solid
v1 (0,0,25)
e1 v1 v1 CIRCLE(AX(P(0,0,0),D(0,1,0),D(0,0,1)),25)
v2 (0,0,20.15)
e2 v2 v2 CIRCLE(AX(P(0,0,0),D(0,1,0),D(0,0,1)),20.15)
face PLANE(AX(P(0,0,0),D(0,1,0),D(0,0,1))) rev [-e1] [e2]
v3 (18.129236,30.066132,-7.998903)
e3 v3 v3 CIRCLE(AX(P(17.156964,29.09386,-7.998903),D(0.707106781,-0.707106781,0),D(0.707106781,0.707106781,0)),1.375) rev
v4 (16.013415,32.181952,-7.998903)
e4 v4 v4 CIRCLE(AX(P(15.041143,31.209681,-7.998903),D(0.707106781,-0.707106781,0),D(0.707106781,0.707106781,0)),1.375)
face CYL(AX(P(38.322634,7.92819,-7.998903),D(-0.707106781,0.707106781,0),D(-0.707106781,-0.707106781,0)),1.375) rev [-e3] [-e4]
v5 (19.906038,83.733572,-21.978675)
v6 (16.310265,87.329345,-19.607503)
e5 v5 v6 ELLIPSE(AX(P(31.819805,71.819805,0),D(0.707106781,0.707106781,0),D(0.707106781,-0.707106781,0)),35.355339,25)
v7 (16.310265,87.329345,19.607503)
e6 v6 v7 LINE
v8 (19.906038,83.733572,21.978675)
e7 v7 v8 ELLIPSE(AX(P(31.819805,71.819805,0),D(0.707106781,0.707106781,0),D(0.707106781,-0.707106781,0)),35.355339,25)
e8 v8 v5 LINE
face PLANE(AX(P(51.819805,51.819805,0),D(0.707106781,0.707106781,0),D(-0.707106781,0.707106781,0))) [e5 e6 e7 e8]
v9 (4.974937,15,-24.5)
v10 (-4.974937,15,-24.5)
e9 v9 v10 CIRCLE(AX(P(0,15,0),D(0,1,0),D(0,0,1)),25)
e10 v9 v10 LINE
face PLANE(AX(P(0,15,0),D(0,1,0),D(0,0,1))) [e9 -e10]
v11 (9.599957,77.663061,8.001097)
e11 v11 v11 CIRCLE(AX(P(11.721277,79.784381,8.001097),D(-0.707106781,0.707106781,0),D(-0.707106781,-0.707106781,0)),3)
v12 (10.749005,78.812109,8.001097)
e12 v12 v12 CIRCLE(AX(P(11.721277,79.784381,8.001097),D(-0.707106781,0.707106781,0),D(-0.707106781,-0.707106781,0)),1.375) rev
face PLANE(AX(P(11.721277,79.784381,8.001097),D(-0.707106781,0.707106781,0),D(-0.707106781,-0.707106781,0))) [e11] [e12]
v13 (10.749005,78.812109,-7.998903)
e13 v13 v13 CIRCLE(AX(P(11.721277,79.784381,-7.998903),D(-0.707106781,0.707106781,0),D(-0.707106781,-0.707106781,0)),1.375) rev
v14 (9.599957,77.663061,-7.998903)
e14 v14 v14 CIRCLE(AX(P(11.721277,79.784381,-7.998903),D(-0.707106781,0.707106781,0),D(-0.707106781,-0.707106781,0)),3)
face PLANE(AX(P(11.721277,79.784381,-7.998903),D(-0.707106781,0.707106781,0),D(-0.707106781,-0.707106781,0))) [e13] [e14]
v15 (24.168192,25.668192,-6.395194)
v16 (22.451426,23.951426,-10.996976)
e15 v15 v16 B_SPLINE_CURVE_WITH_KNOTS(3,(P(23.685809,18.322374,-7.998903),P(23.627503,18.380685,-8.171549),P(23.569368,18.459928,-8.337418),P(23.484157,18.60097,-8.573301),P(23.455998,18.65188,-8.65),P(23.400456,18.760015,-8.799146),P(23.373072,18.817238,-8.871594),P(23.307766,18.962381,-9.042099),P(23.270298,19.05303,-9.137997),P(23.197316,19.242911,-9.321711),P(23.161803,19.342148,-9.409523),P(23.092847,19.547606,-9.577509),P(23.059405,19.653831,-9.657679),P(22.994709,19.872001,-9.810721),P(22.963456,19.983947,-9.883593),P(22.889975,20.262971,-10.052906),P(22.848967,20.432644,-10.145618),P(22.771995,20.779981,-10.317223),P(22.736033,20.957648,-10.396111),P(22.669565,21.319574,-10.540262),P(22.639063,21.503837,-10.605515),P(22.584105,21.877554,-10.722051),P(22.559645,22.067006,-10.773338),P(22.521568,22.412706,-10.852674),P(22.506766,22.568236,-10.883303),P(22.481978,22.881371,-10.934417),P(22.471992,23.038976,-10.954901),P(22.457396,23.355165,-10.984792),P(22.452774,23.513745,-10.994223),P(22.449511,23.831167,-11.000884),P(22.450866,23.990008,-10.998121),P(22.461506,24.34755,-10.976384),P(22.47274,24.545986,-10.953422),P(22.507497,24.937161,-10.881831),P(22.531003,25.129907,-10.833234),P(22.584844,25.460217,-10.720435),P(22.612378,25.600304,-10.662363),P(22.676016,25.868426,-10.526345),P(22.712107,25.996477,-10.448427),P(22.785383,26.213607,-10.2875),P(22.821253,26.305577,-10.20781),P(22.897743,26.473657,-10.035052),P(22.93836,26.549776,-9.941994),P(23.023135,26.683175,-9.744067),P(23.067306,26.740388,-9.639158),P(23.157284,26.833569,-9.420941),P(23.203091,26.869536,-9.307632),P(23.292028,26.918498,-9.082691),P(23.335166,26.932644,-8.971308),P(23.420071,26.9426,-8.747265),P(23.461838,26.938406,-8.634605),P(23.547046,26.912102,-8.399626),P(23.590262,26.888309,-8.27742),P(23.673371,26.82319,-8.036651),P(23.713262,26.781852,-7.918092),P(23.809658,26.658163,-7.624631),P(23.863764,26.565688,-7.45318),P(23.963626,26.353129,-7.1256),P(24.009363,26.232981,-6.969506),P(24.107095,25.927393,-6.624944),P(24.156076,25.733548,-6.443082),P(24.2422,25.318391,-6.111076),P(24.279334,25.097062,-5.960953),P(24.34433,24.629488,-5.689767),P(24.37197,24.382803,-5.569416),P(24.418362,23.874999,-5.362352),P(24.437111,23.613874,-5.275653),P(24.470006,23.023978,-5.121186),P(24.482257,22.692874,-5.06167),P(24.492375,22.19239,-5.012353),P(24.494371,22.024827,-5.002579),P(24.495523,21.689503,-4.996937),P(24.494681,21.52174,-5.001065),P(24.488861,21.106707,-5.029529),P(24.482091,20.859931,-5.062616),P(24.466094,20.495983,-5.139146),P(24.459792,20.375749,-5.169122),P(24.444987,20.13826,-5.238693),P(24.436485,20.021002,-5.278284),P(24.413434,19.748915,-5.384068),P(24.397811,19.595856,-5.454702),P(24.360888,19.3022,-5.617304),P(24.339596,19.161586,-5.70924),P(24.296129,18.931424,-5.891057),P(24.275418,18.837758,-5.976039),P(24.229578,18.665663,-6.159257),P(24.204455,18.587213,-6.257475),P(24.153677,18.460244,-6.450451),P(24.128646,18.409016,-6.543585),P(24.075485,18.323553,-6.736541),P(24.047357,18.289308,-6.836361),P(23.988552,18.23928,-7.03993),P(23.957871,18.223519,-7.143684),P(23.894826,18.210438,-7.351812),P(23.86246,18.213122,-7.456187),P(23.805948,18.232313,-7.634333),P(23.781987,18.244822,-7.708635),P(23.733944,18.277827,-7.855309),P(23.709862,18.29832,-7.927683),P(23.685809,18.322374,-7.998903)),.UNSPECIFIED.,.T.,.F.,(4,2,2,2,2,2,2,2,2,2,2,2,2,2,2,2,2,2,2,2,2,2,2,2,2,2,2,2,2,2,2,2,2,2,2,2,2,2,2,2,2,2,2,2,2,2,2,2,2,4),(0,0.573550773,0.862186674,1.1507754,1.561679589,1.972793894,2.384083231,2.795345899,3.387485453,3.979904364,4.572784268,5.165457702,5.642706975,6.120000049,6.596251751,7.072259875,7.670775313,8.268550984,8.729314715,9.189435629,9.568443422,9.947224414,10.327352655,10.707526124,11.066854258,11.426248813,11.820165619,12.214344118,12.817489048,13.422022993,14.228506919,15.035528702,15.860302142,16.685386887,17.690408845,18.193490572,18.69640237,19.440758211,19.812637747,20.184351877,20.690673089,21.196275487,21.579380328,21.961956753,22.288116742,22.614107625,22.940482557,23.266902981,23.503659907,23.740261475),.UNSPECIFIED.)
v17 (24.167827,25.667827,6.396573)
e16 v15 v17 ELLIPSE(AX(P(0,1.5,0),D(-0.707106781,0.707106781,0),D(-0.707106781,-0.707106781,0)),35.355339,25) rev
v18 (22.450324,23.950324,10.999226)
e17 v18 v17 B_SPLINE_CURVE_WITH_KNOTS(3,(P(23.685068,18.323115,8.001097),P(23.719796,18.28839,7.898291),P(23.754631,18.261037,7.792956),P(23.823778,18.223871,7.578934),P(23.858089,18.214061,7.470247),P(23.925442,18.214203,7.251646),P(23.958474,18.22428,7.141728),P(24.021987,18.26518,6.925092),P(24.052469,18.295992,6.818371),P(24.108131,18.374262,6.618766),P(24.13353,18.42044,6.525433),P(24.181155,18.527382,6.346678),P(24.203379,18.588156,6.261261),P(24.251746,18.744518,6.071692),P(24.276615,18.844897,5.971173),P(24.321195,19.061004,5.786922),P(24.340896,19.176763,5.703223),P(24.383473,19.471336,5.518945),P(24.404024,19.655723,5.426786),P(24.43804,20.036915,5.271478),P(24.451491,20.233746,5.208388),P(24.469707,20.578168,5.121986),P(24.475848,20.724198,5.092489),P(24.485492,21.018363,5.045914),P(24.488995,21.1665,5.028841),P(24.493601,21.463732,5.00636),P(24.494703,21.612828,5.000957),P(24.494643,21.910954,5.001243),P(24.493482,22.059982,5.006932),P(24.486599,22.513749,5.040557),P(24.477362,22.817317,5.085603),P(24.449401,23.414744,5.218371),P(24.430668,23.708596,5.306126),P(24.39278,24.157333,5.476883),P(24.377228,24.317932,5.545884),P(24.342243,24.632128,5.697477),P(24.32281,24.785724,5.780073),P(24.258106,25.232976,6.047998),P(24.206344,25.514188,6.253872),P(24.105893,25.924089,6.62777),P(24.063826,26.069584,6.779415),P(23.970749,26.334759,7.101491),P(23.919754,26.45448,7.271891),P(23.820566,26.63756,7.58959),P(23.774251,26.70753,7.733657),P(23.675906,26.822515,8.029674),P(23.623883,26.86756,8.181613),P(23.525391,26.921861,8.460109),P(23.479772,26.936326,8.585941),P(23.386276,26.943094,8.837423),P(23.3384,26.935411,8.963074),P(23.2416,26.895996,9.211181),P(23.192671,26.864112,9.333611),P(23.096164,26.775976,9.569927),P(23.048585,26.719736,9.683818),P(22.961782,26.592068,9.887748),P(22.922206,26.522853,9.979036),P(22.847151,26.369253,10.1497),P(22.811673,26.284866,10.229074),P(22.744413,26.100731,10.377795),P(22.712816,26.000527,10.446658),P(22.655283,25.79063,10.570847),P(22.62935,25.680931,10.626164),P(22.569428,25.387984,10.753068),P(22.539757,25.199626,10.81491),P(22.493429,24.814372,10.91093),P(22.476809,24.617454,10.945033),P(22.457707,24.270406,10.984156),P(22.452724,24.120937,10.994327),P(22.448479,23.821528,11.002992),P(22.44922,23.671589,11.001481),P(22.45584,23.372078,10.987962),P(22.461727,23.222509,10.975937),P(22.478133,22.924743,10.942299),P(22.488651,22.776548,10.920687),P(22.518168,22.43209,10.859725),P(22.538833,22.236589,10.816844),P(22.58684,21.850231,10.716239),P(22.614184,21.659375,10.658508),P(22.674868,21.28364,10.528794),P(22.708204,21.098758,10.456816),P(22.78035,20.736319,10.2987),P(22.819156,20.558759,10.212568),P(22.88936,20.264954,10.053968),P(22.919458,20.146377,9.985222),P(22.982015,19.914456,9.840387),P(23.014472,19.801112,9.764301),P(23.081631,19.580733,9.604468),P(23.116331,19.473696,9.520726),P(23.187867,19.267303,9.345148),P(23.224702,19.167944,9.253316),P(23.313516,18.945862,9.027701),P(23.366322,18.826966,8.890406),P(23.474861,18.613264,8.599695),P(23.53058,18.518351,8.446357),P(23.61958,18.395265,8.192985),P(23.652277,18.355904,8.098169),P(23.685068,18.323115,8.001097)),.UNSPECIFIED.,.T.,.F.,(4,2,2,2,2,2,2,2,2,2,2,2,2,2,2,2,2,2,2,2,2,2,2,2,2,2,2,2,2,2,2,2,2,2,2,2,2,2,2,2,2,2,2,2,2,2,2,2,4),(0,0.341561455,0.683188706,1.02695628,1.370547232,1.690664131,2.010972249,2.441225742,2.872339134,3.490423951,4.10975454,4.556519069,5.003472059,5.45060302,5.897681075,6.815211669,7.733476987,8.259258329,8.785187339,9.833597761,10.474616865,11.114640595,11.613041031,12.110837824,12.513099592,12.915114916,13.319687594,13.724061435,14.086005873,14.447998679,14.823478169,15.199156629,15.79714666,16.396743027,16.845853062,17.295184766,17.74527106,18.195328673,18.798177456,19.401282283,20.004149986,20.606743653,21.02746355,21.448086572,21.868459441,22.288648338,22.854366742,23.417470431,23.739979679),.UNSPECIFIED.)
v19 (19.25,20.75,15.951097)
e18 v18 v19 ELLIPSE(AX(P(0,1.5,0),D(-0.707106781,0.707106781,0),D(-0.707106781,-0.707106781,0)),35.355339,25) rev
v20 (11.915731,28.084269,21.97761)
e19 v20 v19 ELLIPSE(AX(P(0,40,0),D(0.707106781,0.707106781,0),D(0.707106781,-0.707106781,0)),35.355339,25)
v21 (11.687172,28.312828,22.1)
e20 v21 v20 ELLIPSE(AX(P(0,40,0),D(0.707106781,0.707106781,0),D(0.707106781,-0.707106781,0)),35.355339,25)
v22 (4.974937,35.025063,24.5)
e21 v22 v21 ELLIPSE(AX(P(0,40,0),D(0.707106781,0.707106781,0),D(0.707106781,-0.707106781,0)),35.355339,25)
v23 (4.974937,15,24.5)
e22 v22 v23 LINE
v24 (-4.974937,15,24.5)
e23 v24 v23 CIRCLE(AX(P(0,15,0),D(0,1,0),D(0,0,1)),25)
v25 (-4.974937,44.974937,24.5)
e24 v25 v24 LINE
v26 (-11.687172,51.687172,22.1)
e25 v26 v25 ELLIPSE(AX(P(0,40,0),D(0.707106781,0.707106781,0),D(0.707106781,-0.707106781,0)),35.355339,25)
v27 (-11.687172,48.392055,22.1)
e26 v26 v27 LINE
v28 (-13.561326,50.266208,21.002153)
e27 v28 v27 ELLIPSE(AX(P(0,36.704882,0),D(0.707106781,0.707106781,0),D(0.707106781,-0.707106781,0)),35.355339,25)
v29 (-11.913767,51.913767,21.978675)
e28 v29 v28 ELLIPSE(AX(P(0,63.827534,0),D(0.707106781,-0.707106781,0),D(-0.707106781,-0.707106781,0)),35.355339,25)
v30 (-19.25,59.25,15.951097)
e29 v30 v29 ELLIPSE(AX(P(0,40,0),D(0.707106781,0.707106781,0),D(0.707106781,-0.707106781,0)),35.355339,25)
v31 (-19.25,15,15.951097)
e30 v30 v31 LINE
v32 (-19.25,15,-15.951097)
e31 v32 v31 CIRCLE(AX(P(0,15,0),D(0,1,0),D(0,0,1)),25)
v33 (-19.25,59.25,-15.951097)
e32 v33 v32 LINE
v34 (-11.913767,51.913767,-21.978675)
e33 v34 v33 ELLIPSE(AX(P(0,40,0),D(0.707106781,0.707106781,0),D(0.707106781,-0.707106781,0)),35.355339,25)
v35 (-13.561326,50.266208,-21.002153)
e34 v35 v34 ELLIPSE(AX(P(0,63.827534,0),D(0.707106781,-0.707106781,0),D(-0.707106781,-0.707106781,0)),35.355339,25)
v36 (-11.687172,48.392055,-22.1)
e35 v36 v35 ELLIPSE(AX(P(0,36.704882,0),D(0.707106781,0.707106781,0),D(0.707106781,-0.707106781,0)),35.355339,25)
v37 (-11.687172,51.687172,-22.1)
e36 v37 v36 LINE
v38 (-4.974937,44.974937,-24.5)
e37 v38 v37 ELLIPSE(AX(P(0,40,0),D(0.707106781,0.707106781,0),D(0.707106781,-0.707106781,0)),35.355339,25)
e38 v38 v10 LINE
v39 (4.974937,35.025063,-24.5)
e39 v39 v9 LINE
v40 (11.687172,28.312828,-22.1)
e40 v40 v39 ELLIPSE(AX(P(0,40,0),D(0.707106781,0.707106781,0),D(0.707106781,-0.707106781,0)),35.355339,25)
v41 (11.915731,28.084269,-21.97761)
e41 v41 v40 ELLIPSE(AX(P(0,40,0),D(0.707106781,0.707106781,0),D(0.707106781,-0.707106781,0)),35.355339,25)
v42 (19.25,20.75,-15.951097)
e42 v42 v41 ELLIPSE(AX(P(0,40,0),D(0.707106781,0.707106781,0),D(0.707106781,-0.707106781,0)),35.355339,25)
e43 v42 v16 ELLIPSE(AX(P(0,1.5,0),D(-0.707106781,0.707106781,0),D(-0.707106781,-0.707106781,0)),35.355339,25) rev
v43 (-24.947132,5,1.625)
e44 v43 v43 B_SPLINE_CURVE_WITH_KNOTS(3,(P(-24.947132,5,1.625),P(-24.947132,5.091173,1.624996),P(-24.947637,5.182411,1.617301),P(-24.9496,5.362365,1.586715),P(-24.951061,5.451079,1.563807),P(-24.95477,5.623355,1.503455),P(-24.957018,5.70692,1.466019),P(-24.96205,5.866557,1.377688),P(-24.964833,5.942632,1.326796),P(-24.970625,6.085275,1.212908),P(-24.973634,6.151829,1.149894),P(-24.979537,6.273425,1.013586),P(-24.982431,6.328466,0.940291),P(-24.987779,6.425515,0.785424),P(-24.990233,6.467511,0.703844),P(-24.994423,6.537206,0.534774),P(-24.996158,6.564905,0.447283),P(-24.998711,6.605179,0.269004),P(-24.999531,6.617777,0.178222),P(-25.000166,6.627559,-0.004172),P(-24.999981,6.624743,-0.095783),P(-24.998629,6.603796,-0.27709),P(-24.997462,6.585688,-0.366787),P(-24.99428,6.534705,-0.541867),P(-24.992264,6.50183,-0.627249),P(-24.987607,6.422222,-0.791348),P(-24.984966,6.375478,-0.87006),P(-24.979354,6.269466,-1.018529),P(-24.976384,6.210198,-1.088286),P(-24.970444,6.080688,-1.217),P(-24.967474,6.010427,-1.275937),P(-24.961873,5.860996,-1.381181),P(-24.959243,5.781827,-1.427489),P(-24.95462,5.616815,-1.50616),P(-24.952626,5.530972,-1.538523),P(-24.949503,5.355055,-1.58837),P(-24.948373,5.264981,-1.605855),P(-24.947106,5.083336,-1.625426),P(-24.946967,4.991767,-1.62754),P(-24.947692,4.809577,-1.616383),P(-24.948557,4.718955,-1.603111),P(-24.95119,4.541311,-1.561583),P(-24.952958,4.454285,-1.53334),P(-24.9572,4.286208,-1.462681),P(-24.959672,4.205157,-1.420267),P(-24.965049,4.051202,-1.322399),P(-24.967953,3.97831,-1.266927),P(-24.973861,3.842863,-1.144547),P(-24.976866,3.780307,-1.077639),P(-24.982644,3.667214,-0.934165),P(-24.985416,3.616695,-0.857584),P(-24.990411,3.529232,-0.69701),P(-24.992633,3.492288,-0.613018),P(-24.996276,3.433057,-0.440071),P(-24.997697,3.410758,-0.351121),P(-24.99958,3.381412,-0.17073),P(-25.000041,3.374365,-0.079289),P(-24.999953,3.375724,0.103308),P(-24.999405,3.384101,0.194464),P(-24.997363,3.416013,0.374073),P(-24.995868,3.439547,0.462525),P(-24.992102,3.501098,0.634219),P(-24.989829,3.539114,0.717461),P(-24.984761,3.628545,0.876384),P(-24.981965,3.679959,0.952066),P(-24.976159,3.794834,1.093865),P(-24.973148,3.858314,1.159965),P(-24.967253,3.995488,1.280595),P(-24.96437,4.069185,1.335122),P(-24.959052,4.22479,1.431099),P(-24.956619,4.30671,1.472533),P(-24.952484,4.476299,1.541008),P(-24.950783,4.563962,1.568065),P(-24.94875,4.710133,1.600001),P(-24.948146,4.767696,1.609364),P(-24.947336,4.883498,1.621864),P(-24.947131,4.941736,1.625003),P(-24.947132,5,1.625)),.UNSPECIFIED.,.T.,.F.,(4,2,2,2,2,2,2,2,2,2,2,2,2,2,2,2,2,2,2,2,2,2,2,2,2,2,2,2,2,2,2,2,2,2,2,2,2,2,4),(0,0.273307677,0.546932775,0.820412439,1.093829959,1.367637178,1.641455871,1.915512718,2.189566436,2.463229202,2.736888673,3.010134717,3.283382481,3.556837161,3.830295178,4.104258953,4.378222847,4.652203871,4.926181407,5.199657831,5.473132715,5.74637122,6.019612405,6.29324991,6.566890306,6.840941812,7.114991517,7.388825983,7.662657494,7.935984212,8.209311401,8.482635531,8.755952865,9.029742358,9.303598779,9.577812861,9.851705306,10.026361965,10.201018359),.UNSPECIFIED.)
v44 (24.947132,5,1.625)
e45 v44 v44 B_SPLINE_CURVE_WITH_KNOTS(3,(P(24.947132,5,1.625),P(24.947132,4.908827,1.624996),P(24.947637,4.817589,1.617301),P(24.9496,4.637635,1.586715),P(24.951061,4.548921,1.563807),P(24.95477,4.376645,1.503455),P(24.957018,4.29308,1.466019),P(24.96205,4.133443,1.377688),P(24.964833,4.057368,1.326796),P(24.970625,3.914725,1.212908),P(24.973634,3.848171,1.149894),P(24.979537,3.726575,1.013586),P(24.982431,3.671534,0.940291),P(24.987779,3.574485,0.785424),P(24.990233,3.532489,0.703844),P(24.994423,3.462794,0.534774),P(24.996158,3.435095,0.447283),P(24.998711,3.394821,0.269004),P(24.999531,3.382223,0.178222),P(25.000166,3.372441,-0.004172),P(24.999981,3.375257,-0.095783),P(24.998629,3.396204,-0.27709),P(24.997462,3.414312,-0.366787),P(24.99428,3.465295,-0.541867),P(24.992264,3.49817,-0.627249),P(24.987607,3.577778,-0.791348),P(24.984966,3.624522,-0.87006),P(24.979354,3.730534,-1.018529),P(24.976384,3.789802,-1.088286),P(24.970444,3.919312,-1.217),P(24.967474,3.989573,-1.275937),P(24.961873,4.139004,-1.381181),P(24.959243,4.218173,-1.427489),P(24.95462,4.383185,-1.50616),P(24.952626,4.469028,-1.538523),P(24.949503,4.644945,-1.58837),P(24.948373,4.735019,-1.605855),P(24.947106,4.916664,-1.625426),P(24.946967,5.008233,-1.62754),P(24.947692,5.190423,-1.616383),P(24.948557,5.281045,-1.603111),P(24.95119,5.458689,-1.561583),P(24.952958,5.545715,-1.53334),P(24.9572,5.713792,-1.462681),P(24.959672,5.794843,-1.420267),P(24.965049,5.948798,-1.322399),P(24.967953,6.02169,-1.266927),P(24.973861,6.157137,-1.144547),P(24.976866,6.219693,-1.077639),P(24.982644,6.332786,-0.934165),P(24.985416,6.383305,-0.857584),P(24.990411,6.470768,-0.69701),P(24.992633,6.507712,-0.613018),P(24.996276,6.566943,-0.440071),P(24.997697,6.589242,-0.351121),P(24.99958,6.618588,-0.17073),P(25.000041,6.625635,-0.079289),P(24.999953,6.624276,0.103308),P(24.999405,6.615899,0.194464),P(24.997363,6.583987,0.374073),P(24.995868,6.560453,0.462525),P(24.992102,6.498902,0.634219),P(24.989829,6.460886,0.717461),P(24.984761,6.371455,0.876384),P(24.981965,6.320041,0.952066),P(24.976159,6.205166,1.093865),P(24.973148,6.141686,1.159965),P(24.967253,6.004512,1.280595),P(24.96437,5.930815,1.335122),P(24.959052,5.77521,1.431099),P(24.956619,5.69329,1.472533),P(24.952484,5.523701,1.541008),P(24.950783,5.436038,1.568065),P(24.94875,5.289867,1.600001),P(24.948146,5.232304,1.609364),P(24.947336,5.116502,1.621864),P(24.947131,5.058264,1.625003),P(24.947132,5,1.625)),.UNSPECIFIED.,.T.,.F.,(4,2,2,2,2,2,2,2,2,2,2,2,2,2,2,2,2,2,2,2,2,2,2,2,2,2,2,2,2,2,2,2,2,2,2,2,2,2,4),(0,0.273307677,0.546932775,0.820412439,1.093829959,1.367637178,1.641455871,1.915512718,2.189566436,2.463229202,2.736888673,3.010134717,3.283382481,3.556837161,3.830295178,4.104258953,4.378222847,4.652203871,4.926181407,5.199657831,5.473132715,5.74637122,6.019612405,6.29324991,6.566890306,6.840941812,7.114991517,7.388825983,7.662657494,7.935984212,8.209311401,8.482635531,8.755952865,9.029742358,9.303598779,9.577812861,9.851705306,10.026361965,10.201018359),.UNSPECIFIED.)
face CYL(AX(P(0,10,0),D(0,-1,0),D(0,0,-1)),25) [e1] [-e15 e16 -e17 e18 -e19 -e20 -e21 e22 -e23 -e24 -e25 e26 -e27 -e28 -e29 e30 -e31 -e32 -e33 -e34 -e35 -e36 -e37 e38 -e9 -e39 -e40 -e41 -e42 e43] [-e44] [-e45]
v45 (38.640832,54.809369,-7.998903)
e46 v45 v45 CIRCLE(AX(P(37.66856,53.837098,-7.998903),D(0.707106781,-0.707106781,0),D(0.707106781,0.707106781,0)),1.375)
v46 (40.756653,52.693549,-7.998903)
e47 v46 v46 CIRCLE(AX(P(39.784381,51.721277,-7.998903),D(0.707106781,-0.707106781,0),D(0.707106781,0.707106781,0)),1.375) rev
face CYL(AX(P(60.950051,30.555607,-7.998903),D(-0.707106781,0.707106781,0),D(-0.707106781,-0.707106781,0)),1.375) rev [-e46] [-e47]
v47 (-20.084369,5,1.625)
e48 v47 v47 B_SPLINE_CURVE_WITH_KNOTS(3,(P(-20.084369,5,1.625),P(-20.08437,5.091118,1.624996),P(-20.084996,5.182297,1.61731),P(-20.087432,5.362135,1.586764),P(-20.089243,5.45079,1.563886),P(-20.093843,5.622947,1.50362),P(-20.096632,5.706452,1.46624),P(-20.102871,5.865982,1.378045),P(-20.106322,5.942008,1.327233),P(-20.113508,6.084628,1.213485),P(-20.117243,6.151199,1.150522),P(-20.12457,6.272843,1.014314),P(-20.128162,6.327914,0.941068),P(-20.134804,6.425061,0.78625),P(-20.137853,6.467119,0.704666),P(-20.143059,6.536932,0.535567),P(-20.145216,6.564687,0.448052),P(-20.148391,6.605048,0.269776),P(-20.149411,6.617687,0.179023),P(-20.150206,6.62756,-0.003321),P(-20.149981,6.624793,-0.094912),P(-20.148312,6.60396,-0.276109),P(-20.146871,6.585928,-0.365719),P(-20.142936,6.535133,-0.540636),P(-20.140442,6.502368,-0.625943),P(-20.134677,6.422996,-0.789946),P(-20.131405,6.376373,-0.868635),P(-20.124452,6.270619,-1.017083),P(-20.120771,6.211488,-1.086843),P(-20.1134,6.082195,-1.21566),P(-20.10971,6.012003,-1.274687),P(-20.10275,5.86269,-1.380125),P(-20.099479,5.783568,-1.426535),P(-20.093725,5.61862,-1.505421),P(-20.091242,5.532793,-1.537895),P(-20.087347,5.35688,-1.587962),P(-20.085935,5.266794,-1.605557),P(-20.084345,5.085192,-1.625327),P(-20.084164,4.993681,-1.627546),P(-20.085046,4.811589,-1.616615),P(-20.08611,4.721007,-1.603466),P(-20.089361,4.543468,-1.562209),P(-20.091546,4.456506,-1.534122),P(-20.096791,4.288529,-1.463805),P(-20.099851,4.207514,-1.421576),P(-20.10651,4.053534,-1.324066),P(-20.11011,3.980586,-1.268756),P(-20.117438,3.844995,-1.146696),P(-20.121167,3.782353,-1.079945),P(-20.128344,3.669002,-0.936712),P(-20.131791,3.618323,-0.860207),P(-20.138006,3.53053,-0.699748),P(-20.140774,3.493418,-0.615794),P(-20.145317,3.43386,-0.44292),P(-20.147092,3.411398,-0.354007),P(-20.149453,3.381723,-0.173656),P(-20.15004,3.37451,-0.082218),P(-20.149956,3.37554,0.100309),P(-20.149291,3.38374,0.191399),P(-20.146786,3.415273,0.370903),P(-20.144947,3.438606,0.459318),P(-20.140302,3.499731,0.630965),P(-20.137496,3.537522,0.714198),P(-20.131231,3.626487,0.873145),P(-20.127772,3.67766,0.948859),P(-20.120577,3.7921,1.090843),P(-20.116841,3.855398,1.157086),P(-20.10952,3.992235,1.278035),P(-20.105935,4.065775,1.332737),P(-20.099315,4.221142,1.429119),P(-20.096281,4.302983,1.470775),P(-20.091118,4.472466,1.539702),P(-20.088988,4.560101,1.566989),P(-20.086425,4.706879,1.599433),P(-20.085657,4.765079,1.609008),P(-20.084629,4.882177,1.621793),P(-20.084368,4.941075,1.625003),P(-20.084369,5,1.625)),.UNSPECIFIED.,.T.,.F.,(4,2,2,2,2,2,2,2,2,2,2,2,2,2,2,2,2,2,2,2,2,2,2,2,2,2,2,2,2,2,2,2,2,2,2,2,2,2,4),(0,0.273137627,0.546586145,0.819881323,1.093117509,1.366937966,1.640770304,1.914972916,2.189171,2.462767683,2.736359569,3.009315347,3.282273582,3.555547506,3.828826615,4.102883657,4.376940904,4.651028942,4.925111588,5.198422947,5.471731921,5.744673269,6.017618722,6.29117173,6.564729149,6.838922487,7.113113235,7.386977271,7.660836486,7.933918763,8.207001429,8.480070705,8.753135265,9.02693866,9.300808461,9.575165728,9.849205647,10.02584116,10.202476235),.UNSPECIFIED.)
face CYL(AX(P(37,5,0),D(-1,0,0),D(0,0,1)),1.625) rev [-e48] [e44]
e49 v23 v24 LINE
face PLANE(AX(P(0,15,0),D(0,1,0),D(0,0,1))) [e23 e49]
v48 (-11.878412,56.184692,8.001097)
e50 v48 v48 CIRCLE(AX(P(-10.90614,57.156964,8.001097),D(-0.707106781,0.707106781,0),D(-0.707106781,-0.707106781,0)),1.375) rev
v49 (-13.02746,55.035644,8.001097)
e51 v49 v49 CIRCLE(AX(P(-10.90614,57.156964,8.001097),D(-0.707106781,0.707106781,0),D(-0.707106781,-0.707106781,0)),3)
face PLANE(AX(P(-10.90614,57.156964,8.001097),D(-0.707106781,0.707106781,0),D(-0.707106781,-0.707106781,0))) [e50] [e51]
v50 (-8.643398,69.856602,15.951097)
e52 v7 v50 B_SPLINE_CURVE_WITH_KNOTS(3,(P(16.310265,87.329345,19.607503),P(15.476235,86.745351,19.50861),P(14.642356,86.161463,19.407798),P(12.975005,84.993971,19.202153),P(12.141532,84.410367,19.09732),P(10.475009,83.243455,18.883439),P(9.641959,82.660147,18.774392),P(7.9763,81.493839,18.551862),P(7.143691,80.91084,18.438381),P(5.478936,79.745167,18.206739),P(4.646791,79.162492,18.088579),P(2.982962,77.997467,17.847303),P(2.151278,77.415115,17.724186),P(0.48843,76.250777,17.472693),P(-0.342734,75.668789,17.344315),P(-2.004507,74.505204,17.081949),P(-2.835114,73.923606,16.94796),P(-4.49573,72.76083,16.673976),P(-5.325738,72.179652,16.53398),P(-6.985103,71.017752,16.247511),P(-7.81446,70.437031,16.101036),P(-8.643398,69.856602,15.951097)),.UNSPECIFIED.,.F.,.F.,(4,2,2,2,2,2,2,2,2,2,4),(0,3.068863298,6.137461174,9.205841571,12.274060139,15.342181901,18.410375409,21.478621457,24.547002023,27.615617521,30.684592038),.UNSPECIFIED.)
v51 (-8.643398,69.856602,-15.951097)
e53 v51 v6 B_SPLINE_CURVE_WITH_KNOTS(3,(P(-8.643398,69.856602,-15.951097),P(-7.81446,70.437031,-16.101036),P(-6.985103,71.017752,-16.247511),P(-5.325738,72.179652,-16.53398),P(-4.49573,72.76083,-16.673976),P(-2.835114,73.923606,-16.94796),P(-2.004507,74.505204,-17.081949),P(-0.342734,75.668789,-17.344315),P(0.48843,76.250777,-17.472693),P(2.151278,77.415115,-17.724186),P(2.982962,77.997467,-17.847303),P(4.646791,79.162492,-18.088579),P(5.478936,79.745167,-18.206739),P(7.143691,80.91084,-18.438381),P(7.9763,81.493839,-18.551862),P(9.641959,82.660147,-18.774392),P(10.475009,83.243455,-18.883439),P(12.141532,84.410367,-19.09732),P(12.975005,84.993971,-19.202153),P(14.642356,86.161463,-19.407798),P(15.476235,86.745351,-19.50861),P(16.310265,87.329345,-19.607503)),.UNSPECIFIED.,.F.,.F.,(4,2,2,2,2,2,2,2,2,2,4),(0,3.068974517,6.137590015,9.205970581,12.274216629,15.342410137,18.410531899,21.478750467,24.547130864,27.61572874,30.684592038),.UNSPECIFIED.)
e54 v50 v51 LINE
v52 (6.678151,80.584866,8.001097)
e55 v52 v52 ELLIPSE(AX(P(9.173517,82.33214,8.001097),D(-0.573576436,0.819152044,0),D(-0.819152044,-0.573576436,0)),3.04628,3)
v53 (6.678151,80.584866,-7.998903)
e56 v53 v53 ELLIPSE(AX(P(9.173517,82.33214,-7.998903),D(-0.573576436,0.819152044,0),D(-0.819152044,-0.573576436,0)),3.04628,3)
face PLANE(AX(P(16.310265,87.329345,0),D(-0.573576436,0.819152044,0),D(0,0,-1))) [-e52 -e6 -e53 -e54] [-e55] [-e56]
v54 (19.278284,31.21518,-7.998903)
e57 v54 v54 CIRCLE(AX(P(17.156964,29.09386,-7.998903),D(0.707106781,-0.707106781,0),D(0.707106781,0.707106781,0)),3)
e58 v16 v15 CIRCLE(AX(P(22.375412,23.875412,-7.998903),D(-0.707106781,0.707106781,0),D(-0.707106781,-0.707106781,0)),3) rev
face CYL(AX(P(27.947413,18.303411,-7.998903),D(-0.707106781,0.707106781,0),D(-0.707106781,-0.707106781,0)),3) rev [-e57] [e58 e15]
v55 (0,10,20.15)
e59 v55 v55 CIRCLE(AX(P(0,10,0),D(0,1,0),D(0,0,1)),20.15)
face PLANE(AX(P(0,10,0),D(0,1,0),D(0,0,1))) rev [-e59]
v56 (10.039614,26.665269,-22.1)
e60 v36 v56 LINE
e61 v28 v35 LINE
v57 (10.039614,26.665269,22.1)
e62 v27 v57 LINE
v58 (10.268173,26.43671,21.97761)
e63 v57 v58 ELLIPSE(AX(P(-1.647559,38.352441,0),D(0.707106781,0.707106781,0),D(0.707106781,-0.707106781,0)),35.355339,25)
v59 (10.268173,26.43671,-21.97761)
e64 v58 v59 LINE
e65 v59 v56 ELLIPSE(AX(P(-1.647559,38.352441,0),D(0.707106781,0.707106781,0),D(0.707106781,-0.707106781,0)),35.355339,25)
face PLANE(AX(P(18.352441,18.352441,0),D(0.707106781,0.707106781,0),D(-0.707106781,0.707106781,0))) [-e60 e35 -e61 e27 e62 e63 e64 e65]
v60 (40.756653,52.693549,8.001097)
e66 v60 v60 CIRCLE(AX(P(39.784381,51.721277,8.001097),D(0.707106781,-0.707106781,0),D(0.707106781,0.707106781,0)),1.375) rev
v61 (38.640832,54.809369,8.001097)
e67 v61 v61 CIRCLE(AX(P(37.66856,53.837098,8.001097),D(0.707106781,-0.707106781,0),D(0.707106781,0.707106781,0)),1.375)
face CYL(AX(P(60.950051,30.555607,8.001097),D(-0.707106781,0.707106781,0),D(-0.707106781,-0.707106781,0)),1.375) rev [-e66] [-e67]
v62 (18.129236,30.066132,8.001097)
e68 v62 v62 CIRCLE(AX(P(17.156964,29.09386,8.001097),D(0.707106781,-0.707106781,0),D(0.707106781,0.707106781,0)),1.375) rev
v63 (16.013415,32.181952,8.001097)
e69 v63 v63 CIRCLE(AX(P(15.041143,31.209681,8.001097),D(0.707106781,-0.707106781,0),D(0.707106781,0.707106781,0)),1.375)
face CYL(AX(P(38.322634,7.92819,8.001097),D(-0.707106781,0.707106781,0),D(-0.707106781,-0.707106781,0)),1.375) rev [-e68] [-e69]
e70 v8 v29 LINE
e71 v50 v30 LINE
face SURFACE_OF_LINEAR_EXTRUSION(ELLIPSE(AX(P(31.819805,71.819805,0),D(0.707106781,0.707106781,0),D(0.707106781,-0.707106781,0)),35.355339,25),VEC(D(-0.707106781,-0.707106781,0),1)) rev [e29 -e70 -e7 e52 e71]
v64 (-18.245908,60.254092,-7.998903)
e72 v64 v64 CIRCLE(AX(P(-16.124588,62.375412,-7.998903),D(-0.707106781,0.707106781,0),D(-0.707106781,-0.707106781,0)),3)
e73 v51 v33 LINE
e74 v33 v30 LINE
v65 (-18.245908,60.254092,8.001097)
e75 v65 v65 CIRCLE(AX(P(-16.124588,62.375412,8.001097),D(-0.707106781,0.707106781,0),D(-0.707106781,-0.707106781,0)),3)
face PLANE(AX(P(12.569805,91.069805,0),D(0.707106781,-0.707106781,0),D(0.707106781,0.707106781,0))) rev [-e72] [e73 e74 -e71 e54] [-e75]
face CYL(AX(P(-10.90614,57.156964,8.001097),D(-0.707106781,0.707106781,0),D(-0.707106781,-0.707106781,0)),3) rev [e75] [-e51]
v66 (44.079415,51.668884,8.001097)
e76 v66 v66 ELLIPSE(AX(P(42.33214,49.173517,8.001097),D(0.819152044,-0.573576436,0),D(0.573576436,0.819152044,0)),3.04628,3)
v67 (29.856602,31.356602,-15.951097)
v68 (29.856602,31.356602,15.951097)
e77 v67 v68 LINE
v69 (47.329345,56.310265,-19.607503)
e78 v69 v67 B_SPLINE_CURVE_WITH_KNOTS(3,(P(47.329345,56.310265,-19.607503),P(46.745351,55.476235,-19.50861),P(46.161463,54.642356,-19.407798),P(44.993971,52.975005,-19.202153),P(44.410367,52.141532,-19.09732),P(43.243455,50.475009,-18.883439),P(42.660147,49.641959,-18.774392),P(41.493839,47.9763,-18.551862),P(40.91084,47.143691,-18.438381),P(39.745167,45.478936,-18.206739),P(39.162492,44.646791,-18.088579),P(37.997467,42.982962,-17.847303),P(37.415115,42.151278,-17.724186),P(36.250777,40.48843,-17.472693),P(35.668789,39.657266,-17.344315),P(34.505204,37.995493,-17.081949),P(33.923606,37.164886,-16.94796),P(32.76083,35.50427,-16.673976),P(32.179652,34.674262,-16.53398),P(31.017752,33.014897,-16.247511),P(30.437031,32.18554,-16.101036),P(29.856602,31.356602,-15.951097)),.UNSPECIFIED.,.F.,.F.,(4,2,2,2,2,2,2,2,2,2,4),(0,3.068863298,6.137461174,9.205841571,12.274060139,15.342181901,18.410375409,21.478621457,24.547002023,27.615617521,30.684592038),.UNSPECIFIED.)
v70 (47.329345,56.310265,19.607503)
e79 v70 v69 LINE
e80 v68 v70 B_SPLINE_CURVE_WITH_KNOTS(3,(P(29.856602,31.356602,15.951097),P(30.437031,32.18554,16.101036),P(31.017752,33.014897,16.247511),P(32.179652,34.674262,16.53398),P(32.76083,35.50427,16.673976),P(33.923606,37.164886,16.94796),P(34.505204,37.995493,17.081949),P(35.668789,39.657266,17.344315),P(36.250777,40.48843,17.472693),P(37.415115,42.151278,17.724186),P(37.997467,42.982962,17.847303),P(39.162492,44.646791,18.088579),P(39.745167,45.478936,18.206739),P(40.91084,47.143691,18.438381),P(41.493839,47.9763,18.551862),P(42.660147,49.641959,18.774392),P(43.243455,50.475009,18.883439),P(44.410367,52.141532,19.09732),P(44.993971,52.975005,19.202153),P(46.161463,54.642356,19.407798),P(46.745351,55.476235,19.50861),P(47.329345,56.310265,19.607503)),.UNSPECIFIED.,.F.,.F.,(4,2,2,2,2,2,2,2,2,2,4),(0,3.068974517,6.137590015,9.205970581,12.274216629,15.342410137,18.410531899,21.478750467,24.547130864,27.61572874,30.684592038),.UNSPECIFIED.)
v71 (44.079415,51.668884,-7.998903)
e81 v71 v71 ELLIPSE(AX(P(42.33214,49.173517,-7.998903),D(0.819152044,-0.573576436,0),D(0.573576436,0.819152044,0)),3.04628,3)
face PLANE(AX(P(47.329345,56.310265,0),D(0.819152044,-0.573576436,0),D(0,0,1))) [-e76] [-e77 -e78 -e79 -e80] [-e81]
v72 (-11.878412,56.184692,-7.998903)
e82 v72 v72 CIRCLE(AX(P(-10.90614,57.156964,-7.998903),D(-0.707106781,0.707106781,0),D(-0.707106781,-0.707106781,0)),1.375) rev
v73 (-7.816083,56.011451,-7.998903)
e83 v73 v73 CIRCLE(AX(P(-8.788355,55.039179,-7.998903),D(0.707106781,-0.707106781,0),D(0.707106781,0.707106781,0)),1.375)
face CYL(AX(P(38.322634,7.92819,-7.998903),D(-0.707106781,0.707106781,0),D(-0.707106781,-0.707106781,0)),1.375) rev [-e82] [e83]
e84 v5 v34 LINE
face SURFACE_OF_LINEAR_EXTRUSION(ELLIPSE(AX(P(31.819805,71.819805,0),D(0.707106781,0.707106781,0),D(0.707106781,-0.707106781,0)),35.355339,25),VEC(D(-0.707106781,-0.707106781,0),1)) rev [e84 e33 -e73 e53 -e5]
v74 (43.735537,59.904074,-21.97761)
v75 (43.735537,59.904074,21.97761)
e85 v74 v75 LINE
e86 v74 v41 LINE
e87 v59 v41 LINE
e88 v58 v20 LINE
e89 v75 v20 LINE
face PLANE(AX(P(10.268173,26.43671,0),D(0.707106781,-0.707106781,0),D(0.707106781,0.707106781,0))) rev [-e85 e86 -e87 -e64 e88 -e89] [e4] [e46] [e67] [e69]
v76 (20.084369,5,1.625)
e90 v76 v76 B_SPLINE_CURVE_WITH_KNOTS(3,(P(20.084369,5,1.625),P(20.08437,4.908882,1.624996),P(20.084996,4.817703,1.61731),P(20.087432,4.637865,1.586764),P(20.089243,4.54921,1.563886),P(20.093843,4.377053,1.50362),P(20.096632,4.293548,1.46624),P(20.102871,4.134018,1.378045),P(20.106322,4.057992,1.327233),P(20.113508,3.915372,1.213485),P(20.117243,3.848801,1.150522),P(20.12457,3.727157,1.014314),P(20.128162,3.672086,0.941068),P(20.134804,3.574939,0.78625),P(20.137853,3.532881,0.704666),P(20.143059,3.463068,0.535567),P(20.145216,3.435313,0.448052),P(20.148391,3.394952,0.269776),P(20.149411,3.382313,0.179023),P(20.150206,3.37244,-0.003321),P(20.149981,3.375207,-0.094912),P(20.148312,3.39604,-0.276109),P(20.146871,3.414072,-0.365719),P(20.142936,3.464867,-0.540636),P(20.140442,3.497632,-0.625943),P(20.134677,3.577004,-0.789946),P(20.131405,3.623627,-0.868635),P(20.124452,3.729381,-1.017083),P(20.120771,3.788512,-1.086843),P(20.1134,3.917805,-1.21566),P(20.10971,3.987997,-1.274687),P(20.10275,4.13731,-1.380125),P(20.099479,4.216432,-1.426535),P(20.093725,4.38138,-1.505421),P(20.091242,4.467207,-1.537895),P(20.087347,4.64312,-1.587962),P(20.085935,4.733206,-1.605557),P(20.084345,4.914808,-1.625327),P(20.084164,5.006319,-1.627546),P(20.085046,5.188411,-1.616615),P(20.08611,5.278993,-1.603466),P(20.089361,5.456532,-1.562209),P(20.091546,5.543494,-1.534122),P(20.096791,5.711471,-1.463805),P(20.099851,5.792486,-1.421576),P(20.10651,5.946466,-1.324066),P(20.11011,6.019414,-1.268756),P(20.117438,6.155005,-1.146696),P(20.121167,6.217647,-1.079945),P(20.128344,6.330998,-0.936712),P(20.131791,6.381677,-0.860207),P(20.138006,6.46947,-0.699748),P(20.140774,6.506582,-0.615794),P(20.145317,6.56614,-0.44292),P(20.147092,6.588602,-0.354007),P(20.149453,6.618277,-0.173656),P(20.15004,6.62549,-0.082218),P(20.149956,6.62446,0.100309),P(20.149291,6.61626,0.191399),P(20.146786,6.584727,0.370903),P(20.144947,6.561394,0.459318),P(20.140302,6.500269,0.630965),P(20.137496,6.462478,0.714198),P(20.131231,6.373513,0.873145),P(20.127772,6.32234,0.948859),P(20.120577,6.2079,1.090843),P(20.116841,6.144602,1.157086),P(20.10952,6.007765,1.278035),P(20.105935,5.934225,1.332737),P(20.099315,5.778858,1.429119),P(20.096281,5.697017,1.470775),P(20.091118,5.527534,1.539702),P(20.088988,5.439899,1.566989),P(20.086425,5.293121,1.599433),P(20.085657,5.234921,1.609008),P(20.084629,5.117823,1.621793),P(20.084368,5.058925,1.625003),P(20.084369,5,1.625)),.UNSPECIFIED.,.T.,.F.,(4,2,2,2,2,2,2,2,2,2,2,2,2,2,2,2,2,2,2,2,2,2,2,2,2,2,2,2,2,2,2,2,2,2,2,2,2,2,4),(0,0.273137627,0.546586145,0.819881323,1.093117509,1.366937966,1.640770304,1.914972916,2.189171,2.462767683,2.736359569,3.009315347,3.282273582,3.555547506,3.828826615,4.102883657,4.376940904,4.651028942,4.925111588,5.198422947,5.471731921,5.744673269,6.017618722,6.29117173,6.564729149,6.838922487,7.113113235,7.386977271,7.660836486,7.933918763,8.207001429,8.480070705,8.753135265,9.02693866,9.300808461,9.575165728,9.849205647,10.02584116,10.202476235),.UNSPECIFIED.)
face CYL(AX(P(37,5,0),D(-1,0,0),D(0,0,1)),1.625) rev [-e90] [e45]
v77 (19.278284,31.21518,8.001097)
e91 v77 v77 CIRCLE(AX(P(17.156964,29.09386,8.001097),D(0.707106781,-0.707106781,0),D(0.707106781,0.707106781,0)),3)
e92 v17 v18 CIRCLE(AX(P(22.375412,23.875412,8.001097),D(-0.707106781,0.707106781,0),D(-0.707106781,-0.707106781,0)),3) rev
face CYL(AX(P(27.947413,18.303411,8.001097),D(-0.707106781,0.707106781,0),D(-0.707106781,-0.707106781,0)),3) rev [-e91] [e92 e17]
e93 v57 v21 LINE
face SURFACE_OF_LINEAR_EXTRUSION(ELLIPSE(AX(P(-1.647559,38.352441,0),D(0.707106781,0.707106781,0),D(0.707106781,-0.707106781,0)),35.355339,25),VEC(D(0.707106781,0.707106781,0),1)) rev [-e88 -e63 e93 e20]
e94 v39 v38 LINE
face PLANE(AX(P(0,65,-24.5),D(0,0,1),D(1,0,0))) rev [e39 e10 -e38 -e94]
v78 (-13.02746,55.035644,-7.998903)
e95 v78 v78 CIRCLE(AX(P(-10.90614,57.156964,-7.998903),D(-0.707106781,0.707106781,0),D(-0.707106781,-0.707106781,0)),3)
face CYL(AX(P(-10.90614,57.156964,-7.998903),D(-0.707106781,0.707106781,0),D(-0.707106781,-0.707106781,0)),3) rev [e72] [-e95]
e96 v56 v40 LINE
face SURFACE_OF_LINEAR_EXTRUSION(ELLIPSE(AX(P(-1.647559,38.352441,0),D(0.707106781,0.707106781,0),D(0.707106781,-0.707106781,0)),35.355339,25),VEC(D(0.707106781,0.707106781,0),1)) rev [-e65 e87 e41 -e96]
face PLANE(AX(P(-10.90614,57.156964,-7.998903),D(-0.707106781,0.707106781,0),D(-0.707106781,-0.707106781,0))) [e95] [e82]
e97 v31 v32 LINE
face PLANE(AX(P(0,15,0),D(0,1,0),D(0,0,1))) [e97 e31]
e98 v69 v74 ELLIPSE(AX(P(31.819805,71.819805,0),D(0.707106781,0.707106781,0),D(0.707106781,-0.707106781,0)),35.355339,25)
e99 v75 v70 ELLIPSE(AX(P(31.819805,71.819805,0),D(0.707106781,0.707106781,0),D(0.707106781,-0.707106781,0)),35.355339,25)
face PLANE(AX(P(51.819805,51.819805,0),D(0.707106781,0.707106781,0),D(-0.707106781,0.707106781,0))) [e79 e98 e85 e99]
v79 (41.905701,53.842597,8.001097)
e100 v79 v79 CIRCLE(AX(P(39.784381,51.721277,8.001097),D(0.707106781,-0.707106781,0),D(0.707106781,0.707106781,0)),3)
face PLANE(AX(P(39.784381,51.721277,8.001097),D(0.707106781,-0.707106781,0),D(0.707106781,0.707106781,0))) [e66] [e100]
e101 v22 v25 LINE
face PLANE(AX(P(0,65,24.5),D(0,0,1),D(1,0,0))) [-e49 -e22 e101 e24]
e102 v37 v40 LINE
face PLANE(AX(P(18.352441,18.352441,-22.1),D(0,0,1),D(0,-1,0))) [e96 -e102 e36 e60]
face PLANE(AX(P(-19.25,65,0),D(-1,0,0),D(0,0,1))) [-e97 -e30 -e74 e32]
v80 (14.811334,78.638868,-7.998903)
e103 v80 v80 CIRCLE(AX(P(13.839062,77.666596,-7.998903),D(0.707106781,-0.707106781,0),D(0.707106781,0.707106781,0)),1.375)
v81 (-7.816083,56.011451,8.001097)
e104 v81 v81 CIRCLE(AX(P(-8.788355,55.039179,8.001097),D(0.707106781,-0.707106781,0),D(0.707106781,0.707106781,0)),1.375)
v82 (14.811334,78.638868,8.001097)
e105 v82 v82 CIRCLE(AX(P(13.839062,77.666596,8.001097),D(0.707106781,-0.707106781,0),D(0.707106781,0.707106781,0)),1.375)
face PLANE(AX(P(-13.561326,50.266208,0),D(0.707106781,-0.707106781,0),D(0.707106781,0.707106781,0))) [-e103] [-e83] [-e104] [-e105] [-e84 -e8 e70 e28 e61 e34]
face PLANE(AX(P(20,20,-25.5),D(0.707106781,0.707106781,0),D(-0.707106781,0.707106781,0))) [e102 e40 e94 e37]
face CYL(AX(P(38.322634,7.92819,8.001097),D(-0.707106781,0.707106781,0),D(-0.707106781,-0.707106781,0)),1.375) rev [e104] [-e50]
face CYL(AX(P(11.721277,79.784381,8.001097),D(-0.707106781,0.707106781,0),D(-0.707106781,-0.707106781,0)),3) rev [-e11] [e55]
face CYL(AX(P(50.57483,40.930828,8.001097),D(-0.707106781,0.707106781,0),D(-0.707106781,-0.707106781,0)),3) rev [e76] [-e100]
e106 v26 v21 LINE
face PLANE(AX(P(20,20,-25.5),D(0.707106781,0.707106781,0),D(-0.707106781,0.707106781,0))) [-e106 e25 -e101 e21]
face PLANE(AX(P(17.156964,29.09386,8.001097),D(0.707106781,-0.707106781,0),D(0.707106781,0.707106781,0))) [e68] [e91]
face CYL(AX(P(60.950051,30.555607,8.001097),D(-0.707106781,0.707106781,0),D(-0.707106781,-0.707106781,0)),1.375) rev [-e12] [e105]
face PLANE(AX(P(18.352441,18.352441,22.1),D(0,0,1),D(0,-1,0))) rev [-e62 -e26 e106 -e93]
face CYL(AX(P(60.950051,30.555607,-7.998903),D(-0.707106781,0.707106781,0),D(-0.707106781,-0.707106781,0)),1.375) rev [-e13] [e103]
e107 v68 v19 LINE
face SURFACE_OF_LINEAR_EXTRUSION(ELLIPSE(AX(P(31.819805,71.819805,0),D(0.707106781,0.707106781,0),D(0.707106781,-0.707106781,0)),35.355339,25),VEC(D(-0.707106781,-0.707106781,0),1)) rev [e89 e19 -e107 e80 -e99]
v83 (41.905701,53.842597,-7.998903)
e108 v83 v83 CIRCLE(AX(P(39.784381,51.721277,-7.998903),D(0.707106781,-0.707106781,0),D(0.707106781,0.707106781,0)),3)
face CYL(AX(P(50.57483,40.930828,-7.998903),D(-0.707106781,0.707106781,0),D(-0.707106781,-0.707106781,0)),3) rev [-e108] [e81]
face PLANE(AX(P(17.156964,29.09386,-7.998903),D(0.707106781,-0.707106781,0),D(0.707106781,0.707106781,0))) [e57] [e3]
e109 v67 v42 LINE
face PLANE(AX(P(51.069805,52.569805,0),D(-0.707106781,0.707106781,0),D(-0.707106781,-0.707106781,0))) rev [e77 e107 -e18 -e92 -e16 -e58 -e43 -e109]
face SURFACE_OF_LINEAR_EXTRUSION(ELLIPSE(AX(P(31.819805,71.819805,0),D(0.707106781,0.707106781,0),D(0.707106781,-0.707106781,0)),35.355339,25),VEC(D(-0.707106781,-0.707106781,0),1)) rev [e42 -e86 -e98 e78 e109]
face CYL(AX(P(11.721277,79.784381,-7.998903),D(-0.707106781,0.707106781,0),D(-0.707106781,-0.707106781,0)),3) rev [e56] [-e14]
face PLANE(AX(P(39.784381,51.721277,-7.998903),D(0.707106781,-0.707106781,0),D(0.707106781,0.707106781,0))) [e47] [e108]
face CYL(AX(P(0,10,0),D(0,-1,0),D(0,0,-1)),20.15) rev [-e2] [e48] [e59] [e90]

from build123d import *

# Parameters (mm, degrees)
SKETCH1_R               = 25
SKETCH1_R_2             = 20.15
BOSS_EXTRUDE1_DEPTH     = 10
SKETCH2_R               = 25
BOSS_EXTRUDE2_DEPTH     = 5
BOSS_EXTRUDE3_DEPTH     = 50
CUT_EXTRUDE1_DEPTH      = 50
SKETCH5_W               = 44
SKETCH5_H               = 33.5
CUT_EXTRUDE2_DEPTH      = 2.33
SKETCH6_W               = 31.902194282
SKETCH6_H               = 10.372222151
BOSS_EXTRUDE5_DEPTH     = 45
BOSS_EXTRUDE6_DEPTH     = 45
BOSS_EXTRUDE7_DEPTH     = 20
SKETCH10_R              = 1.375
CUT_EXTRUDE3_DEPTH      = 77
SKETCH11_R              = 1.375
CUT_EXTRUDE4_DEPTH      = 77
SKETCH12_R              = 3
CUT_EXTRUDE5_DEPTH      = 7.38
CUT_EXTRUDE6_DEPTH      = 7.88
CUT_EXTRUDE6_DEPTH_BACK = 7.38
SKETCH13_R              = 3
CHAMFER1_SIZE           = 30
CHAMFER1_SIZE_2         = 5.289809421
CUT_EXTRUDE7_DEPTH      = 37
CUT_EXTRUDE7_DEPTH_BACK = 37
SKETCH16_R              = 1.625


with BuildPart() as part:
    # Sketch1 → Boss-Extrude1 (new body)
    with BuildSketch(Plane(origin=(0, 0, 0), x_dir=(1, 0, 0), z_dir=(0, 1, 0))):
        with Locations(Location((0, 0, 0), (0, 0, 270))):
            Circle(SKETCH1_R)
        with Locations(Location((0, 0, 0), (0, 0, 270))):
            Circle(SKETCH1_R_2, mode=Mode.SUBTRACT)
    extrude(amount=BOSS_EXTRUDE1_DEPTH)

    # Sketch2 → Boss-Extrude2 (add)
    with BuildSketch(Plane(origin=(0, 10, 0), x_dir=(1, 0, 0), z_dir=(0, 1, 0))):
        with Locations(Location((0, 0, 0), (0, 0, 270))):
            Circle(SKETCH2_R)
    extrude(amount=BOSS_EXTRUDE2_DEPTH)

    # Sketch3 → Boss-Extrude3 (add)
    with BuildSketch(Plane(origin=(0, 15, 0), x_dir=(1, 0, 0), z_dir=(0, 1, 0))):
        with BuildLine():
            ThreePointArc((4.974937186, -24.5), (12.844564237, -21.448010853), (19.25, -15.951097141))
            Line((19.25, -15.951097141), (19.25, 15.951097141))
            ThreePointArc((19.25, 15.951097141), (12.844564237, 21.448010853), (4.974937186, 24.5))
            Line((4.974937186, 24.5), (-4.974937186, 24.5))
            ThreePointArc((-4.974937186, 24.5), (-12.844564237, 21.448010853), (-19.25, 15.951097141))
            Line((-19.25, 15.951097141), (-19.25, -15.951097141))
            ThreePointArc((-19.25, -15.951097141), (-12.844564237, -21.448010853), (-4.974937186, -24.5))
            Line((-4.974937186, -24.5), (4.974937186, -24.5))
        make_face()
    extrude(amount=BOSS_EXTRUDE3_DEPTH)

    # Sketch4 → Cut-Extrude1 (cut)
    with BuildSketch(Plane.XY.offset(24.5)):
        Polygon((-4.974937186, 44.974937186), (4.974937186, 35.025062814), (4.974937186, 65), (-4.974937186, 65), align=None)
        Polygon((4.974937186, 35.025062814), (25, 15), (25, 65), (4.974937186, 65), align=None)
        Polygon((-19.25, 59.25), (-4.974937186, 44.974937186), (-4.974937186, 65), (-19.25, 65), align=None)
    extrude(amount=-CUT_EXTRUDE1_DEPTH, mode=Mode.SUBTRACT)

    # Sketch5 → Cut-Extrude2 (cut)
    # profile 1 of 2: a face of its own
    with BuildSketch(Plane(origin=(20, 20, 0), x_dir=(0, 0, -1), z_dir=(0.7071067811865485, 0.7071067811865467, 0))):
        with BuildLine():
            Line((21.978674947, 45.132882323), (-21.978674947, 45.132882323))
            add(Edge.make_bspline(
                [(-21.978674947, 45.132882323), (-22.0399199, 44.9730967), (-22.1, 44.81242904)],
                knots=[4.215256564, 4.215256564, 4.215256564, 4.225444941, 4.225444941, 4.225444941], degree=2, weights=[0.971948047, 0.972055152, 0.97218796]))
            Line((-22.1, 44.81242904), (-22.1, 11.756113455))
            add(Edge.make_bspline(
                [(-22.1, 11.756113455), (-22.039397631, 11.594049133), (-21.977610099, 11.432882323)],
                knots=[5.19933302, 5.19933302, 5.19933302, 5.20960995, 5.20960995, 5.20960995], degree=2, weights=[0.97218796, 0.972053998, 0.971946187]))
            Line((-21.977610099, 11.432882323), (21.977610099, 11.432882323))
            add(Edge.make_bspline(
                [(21.977610099, 11.432882323), (22.039397631, 11.594049133), (22.1, 11.756113455)],
                knots=[1.073575357, 1.073575357, 1.073575357, 1.083852287, 1.083852287, 1.083852287], degree=2, weights=[0.971946187, 0.972053998, 0.97218796]))
            Line((22.1, 11.756113455), (22.1, 44.81242904))
            add(Edge.make_bspline(
                [(22.1, 44.81242904), (22.0399199, 44.9730967), (21.978674947, 45.132882323)],
                knots=[2.057740366, 2.057740366, 2.057740366, 2.067928743, 2.067928743, 2.067928743], degree=2, weights=[0.97218796, 0.972055152, 0.971948047]))
        make_face()
        with Locations((0, 28.282882323)):
            Rectangle(SKETCH5_W, SKETCH5_H, mode=Mode.SUBTRACT)
    # profile 2 of 2: a face of its own
    with BuildSketch(Plane(origin=(20, 20, 0), x_dir=(0, 0, -1), z_dir=(0.7071067811865485, 0.7071067811865467, 0))):
        with Locations((0, 28.282882323)):
            Rectangle(SKETCH5_W, SKETCH5_H)
    extrude(amount=-CUT_EXTRUDE2_DEPTH, mode=Mode.SUBTRACT)

    # Sketch6 → Boss-Extrude5 (add)
    with BuildSketch(Plane(origin=(20, 20, 0), x_dir=(0, 0, -1), z_dir=(0.7071067811865487, 0.7071067811865465, 0))):
        with BuildLine():
            Line((-15.951097141, 1.060660172), (-15.951097141, 11.432882323))
            Line((-15.951097141, 11.432882323), (-21.977610099, 11.432882323))
            add(Edge.make_bspline(
                [(-21.977610099, 11.432882323), (-19.67346685, 5.422747233), (-15.951097141, 1.060660172)],
                knots=[5.209205396, 5.209205396, 5.209205396, 5.591230132, 5.591230132, 5.591230132], degree=2, weights=[1, 0.981812537, 1]))
        make_face()
        with Locations((0, 6.246771248)):
            Rectangle(SKETCH6_W, SKETCH6_H)
        with BuildLine():
            Line((21.977610099, 11.432882323), (15.951097141, 11.432882323))
            Line((15.951097141, 11.432882323), (15.951097141, 1.060660172))
            add(Edge.make_bspline(
                [(15.951097141, 1.060660172), (19.67346685, 5.422747233), (21.977610099, 11.432882323)],
                knots=[0.691955175, 0.691955175, 0.691955175, 1.073979912, 1.073979912, 1.073979912], degree=2, weights=[1, 0.981812537, 1]))
        make_face()
    extrude(amount=BOSS_EXTRUDE5_DEPTH)

    # Sketch7 → Boss-Extrude6 (add)
    with BuildSketch(Plane(origin=(20, 20, 0), x_dir=(0, 0, -1), z_dir=(0.7071067811865487, 0.7071067811865465, 0))):
        with BuildLine():
            Line((15.951097141, 55.507882323), (-15.951097141, 55.507882323))
            add(Edge.make_bspline(
                [(-15.951097141, 55.507882323), (-19.67435923, 51.144749519), (-21.978674947, 45.132882323)],
                knots=[3.833547829, 3.833547829, 3.833547829, 4.215661937, 4.215661937, 4.215661937], degree=2, weights=[1, 0.981804052, 1]))
            Line((-21.978674947, 45.132882323), (21.978674947, 45.132882323))
            add(Edge.make_bspline(
                [(21.978674947, 45.132882323), (19.67435923, 51.144749519), (15.951097141, 55.507882323)],
                knots=[2.06752337, 2.06752337, 2.06752337, 2.449637478, 2.449637478, 2.449637478], degree=2, weights=[1, 0.981804052, 1]))
        make_face()
    extrude(amount=BOSS_EXTRUDE6_DEPTH)

    # Sketch8 → Boss-Extrude7 (add)
    with BuildSketch(Plane(origin=(0, 15, 0), x_dir=(1, 0, 0), z_dir=(0, 1, 0))):
        with BuildLine():
            ThreePointArc((25, 0), (23.518609653, 8.477912479), (19.25, 15.951097141))
            Line((19.25, 15.951097141), (19.25, -15.951097141))
            ThreePointArc((19.25, -15.951097141), (23.518609653, -8.477912479), (25, 0))
        make_face()
    extrude(amount=BOSS_EXTRUDE7_DEPTH)

    # Sketch10 → Cut-Extrude3 (cut)
    with BuildSketch(Plane(origin=(-39.25, 39.25, 0), x_dir=(0, 0, 1), z_dir=(-0.7071067811865464, 0.7071067811865487, 0))):
        with Locations(Location((8.001097141, 32.704271247, 0), (0, 0, 270))):
            Circle(SKETCH10_R)
        with Locations(Location((-7.998902859, 32.704271247, 0), (0, 0, 270))):
            Circle(SKETCH10_R)
    extrude(amount=-CUT_EXTRUDE3_DEPTH, mode=Mode.SUBTRACT)

    # Sketch11 → Cut-Extrude4 (cut)
    with BuildSketch(Plane(origin=(-39.25, 39.25, 0), x_dir=(0, 0, 1), z_dir=(-0.7071067811865464, 0.7071067811865487, 0))):
        with Locations(Location((-7.998902859, 64.704271247, 0), (0, 0, 270))):
            Circle(SKETCH11_R)
        with Locations(Location((8.001097141, 64.704271247, 0), (0, 0, 270))):
            Circle(SKETCH11_R)
    extrude(amount=-CUT_EXTRUDE4_DEPTH, mode=Mode.SUBTRACT)

    # Sketch12 → Cut-Extrude5 (cut)
    with BuildSketch(Plane(origin=(-39.25, 39.25, 0), x_dir=(0, 0, 1), z_dir=(-0.7071067811865464, 0.7071067811865487, 0))):
        with Locations(Location((-7.998902859, 64.704271247, 0), (0, 0, 270))):
            Circle(SKETCH12_R)
        with Locations(Location((8.001097141, 64.704271247, 0), (0, 0, 270))):
            Circle(SKETCH12_R)
        with Locations(Location((-7.998902859, 32.704271247, 0), (0, 0, 270))):
            Circle(SKETCH12_R)
        with Locations(Location((8.001097141, 32.704271247, 0), (0, 0, 270))):
            Circle(SKETCH12_R)
    extrude(amount=-CUT_EXTRUDE5_DEPTH, mode=Mode.SUBTRACT)

    # Sketch13 → Cut-Extrude6 (cut, two sides: drawn at the far end of the back side and taken through both)
    with BuildSketch(Plane(origin=(-0.75, 0.75, 0), x_dir=(0, 0, -1), z_dir=(0.7071067811865464, -0.7071067811865487, 0)).offset(-CUT_EXTRUDE6_DEPTH_BACK)):
        with Locations(Location((-8.001097141, 64.704271247, 0), (0, 0, 270))):
            Circle(SKETCH13_R)
        with Locations(Location((7.998902859, 64.704271247, 0), (0, 0, 270))):
            Circle(SKETCH13_R)
        with Locations(Location((-8.001097141, 32.704271247, 0), (0, 0, 270))):
            Circle(SKETCH13_R)
        with Locations(Location((7.998902859, 32.704271247, 0), (0, 0, 270))):
            Circle(SKETCH13_R)
    extrude(amount=CUT_EXTRUDE6_DEPTH + CUT_EXTRUDE6_DEPTH_BACK, mode=Mode.SUBTRACT)

    # Chamfer1
    # the kernel refuses this chamfer: 30, 5.289809421 mm, written as the material it takes off along each edge
    with BuildSketch(Plane(origin=(51.069805153, 52.569805153, 93.907261034), x_dir=(-0.7023657291994666, -0.7118162560985113, 0), z_dir=(0, 0, -1)), Plane(origin=(12.569805153, 91.069805153, -93.907261034), x_dir=(-0.7118162560985133, -0.7023657291994647, 0), z_dir=(0, 0, 1))) as chamfer1_piece_1:
        Polygon((CHAMFER1_SIZE * 0.999977671636, CHAMFER1_SIZE * 0.0066825316561), (-CHAMFER1_SIZE_2 * 0.00668253165642, CHAMFER1_SIZE_2 * 0.999977671684), (0, 0), align=None)
    extrude(amount=187.814522067, mode=Mode.SUBTRACT)

    # Sketch16 → Cut-Extrude7 (cut, two sides: drawn at the far end of the back side and taken through both)
    with BuildSketch(Plane(origin=(0, 0, 0), x_dir=(0, 0, -1), z_dir=(1, 0, 0)).offset(-CUT_EXTRUDE7_DEPTH_BACK)):
        with Locations(Location((0, 5, 0), (0, 0, 180))):
            Circle(SKETCH16_R)
    extrude(amount=CUT_EXTRUDE7_DEPTH + CUT_EXTRUDE7_DEPTH_BACK, mode=Mode.SUBTRACT)


solid = part.part
